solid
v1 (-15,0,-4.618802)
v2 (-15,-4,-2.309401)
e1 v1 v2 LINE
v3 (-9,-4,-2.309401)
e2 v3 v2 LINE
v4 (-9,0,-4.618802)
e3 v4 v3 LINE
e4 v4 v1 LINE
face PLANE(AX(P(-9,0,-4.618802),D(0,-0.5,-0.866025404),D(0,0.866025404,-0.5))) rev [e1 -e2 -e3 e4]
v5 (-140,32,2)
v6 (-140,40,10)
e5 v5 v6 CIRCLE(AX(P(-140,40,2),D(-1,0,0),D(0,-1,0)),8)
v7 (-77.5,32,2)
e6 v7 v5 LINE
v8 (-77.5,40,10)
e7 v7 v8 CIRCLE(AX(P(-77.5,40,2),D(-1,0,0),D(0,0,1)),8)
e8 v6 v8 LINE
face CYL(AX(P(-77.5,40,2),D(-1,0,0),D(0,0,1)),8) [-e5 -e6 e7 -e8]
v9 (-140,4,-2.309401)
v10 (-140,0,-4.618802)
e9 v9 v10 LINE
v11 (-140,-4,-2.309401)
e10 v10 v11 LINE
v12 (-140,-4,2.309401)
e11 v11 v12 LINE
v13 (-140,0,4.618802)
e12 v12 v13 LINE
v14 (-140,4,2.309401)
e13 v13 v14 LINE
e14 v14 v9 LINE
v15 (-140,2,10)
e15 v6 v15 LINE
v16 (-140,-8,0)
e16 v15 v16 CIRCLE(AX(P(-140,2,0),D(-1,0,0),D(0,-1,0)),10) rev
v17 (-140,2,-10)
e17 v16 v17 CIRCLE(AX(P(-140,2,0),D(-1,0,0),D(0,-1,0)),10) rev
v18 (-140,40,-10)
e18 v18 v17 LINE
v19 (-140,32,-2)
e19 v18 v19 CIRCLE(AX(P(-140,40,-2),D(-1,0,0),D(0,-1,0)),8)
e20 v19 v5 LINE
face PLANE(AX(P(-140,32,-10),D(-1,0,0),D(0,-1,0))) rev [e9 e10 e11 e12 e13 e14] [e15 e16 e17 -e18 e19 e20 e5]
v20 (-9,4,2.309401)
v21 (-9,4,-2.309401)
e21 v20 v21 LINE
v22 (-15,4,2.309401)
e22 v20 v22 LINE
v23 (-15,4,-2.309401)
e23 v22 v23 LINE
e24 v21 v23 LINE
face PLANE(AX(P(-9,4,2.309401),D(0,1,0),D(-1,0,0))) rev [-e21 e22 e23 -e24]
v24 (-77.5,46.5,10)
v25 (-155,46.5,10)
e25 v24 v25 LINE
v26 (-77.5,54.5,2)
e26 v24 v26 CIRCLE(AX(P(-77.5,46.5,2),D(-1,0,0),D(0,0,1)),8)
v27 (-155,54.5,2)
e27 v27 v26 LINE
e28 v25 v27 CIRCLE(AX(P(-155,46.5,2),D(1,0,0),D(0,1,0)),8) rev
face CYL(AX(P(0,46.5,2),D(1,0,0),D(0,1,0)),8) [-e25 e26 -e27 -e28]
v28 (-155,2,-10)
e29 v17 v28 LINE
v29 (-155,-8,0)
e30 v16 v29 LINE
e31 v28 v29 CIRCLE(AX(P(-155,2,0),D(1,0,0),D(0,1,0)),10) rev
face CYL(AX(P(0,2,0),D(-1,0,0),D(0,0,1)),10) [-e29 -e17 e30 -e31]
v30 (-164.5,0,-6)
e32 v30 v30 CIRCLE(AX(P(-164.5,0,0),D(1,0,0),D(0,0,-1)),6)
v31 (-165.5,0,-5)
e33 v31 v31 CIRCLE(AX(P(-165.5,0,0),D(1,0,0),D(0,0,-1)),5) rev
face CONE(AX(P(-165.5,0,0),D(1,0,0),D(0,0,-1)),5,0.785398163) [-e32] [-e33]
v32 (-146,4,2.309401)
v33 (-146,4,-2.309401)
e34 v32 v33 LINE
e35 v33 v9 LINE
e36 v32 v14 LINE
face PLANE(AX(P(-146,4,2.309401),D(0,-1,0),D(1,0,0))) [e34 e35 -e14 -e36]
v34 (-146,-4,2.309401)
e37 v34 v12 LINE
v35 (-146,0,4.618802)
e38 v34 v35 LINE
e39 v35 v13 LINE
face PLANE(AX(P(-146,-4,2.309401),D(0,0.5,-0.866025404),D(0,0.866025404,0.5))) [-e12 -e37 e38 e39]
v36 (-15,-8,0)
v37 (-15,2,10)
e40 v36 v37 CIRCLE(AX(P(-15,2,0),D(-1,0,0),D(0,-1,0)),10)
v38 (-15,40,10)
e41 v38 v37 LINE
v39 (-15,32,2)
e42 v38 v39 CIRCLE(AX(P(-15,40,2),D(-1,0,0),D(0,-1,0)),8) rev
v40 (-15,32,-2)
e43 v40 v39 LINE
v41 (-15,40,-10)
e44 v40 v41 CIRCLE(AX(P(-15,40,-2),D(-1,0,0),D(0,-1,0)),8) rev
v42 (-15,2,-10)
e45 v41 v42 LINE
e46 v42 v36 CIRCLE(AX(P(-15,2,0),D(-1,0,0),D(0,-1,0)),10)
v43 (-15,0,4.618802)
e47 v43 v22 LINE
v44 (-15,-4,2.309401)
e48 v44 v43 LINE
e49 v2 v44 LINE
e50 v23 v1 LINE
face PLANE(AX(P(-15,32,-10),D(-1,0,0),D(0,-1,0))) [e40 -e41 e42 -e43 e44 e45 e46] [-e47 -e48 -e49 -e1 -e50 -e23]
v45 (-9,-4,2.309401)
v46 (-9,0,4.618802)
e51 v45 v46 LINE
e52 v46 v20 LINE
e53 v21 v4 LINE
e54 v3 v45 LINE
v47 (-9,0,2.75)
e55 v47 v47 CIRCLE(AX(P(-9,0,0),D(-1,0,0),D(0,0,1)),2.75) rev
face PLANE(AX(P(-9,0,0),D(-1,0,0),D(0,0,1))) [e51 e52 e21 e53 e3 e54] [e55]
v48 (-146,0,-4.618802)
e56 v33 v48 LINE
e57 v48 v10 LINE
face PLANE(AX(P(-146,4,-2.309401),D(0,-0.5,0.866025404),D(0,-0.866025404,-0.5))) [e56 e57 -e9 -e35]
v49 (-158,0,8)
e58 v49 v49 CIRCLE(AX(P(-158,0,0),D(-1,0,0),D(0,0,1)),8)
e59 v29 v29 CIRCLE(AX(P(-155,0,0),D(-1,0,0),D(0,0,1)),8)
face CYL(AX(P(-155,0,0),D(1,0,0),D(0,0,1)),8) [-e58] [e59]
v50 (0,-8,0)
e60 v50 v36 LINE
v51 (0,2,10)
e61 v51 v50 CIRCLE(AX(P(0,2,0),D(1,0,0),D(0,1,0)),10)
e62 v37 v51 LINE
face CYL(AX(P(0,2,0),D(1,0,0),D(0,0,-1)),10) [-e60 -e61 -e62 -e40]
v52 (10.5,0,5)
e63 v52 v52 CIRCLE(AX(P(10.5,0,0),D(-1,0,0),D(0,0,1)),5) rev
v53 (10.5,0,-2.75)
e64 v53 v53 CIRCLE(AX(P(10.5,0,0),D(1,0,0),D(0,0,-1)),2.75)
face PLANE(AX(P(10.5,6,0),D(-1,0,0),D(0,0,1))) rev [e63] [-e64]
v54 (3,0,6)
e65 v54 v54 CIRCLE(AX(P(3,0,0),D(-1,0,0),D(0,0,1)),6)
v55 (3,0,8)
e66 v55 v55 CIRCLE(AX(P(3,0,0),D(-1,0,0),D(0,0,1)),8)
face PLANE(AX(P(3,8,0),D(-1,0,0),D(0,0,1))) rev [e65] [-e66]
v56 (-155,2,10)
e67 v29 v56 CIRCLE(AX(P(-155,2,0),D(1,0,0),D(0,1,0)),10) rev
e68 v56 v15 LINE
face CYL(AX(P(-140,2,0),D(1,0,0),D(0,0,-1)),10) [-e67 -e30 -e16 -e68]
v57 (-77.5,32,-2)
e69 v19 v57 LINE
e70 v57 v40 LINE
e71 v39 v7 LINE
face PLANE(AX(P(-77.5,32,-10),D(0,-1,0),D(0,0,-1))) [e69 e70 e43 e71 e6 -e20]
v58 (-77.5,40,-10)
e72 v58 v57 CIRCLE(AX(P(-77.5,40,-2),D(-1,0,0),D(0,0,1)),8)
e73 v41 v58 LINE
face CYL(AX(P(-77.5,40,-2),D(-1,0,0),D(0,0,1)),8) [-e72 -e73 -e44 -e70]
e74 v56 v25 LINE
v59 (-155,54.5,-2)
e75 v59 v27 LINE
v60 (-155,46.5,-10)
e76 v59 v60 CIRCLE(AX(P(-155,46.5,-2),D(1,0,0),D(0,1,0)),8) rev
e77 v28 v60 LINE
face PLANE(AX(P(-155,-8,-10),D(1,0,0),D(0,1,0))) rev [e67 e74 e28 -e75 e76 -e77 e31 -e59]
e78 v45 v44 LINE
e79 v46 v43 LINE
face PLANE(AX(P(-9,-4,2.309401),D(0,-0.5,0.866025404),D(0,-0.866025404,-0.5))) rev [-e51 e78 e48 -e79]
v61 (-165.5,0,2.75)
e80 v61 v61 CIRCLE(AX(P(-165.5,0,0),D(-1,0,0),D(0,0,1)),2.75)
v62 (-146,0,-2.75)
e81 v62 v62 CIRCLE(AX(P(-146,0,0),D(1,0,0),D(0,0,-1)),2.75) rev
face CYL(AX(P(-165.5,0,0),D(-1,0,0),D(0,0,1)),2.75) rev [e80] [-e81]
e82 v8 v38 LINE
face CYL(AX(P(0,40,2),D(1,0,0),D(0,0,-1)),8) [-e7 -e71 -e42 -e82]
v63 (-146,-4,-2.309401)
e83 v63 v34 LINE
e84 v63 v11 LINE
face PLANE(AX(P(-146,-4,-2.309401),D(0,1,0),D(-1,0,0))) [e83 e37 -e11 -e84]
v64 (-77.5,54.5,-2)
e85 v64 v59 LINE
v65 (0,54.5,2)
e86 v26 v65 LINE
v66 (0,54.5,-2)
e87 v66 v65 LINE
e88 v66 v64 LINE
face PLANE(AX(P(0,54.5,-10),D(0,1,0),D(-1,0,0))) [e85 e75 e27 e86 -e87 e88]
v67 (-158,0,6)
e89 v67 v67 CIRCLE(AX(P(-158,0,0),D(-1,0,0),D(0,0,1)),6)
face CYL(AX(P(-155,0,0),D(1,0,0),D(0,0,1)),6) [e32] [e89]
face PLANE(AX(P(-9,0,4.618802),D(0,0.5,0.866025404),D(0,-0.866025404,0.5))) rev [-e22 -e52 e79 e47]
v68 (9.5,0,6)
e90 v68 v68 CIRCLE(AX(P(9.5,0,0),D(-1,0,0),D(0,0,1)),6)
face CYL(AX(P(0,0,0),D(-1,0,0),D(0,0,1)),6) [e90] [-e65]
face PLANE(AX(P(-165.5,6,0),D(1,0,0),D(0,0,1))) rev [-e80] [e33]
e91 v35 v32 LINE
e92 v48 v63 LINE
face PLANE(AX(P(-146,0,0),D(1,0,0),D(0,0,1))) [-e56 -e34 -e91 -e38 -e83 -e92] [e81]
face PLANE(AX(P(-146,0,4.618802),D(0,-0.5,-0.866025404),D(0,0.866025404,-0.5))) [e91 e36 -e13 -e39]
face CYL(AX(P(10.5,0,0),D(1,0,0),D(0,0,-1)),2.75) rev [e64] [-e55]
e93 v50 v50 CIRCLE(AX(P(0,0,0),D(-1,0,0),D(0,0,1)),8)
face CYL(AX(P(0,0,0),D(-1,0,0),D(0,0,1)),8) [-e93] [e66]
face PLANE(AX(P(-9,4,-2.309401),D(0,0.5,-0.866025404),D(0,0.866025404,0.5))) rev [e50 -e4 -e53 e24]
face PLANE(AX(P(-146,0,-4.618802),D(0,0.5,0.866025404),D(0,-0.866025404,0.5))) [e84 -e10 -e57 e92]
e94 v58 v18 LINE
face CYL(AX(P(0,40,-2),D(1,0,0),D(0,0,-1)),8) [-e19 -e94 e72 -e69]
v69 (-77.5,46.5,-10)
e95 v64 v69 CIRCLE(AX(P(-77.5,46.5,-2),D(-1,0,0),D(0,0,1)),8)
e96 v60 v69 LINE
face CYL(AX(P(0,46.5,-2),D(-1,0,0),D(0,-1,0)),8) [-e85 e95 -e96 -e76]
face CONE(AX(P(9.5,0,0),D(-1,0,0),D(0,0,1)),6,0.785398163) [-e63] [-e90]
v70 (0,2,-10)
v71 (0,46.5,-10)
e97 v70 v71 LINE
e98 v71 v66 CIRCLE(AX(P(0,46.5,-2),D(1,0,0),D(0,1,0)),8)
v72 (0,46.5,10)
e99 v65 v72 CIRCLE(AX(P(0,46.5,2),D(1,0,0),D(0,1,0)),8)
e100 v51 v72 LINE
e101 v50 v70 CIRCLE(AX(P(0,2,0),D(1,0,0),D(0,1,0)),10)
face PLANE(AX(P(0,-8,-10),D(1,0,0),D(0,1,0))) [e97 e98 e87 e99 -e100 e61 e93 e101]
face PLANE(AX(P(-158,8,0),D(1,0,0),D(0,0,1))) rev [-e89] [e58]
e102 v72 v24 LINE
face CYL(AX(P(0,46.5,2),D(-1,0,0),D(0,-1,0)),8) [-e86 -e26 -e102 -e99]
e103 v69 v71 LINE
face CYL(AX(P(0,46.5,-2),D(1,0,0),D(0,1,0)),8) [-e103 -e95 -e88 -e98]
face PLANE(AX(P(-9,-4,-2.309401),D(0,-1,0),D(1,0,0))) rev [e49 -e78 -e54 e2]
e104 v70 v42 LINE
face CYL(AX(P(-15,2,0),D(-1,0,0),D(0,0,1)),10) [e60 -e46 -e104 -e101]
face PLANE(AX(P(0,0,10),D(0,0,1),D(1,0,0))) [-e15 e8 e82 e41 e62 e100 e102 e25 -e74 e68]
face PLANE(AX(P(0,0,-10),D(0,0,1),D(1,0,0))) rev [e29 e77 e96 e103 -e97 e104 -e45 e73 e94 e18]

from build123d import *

# Parameters (mm, degrees)
CONNECTOR_MOUNTING_CHAMFER_SIZE              = 1
HANDLE_BODY_DEPTH                            = 10
LOWER_HANDLE_FILLET_R                        = 10
UPPER_HANDLE_FILLET_R                        = 8
MOUNTING_SCREW_HOLE_D                        = 5.5
NUT_CUTOUT_DEPTH                             = 6
LOWER_HANDLE_FILLET_OF_HANDLE_MIRROR_R       = 10
UPPER_HANDLE_FILLET_OF_HANDLE_MIRROR_R       = 8
CONNECTOR_MOUNTING_CHAMFER_OF_CONNECTOR_SIZE = 1


with BuildPart() as part:
    # Sketch1 → connector_body (revolve)
    with BuildSketch(Plane.XY, mode=Mode.PRIVATE) as connector_body_sk:
        Polygon((0, 0), (0, 8), (3, 8), (3, 6), (10.5, 6), (10.5, 0), align=None)
    connector_body = revolve(connector_body_sk.sketch.rotate(Axis((0, 0, 0), (1, 0, 0)), 90), axis=Axis((0, 0, 0), (1, 0, 0)))

    # connector_mounting_chamfer
    connector_mounting_chamfer_edges = [part.edges().sort_by_distance(p)[0] for p in [
        (10.5, 0, -6),
    ]]
    chamfer(connector_mounting_chamfer_edges, length=CONNECTOR_MOUNTING_CHAMFER_SIZE)

    # Sketch2 → handle_body (add, symmetric)
    with BuildSketch(Plane.XY):
        Polygon((0, -8), (0, 54.5), (-77.5, 54.5), (-77.5, 32), (-15, 32), (-15, -8), align=None)
    handle_body = extrude(amount=HANDLE_BODY_DEPTH, both=True)

    # lower_handle_fillet
    # the kernel refuses this fillet: 10 mm, written as the material it takes off along each edge
    with BuildSketch(Plane(origin=(-40, -8, -10), x_dir=(0, 0, 1), z_dir=(1, 0, 0))) as lower_handle_fillet_piece_1:
        with BuildLine():
            CenterArc((LOWER_HANDLE_FILLET_R, -LOWER_HANDLE_FILLET_R), LOWER_HANDLE_FILLET_R, 90, 90)
            Line((0, -LOWER_HANDLE_FILLET_R), (0, 0))
            Line((0, 0), (LOWER_HANDLE_FILLET_R, 0))
        make_face()
    extrude(amount=65, mode=Mode.SUBTRACT)
    with BuildSketch(Plane(origin=(-40, -8, 10), x_dir=(0, 0, -1), z_dir=(1, 0, 0))) as lower_handle_fillet_piece_2:
        with BuildLine():
            CenterArc((LOWER_HANDLE_FILLET_R, LOWER_HANDLE_FILLET_R), LOWER_HANDLE_FILLET_R, 180, 90)
            Line((0, LOWER_HANDLE_FILLET_R), (0, 0))
            Line((0, 0), (LOWER_HANDLE_FILLET_R, 0))
        make_face()
    extrude(amount=65, mode=Mode.SUBTRACT)

    # upper_handle_fillet
    upper_handle_fillet_edges = [part.edges().sort_by_distance(p)[0] for p in [
        (-46.25, 32, -10),
        (-38.75, 54.5, -10),
        (-38.75, 54.5, 10),
        (-46.25, 32, 10),
    ]]
    fillet(upper_handle_fillet_edges, radius=UPPER_HANDLE_FILLET_R)

    # mounting_screw_hole (through all)
    with Locations(Plane(origin=(10.5, 0, 0), x_dir=(0, 0, -1), z_dir=(1, 0, 0))):
        with Locations((0, 0)):
            mounting_screw_hole = Hole(MOUNTING_SCREW_HOLE_D / 2)

    # Sketch6 → nut_cutout (cut)
    with BuildSketch(Plane.ZY.offset(15)):
        Polygon((4.618802154, 0), (2.309401077, 4), (-2.309401077, 4), (-4.618802154, 0), (-2.309401077, -4), (2.309401077, -4), align=None)
    nut_cutout = extrude(amount=-NUT_CUTOUT_DEPTH, mode=Mode.SUBTRACT)

    # handle_mirror: handle_body across plane
    add(handle_body.mirror(Plane(origin=(-77.5, 0, 0), x_dir=(0, 0, 1), z_dir=(1, 0, 0))))

    # lower_handle_fillet of handle_mirror
    # the kernel refuses this fillet: 10 mm, written as the material it takes off along each edge
    with BuildSketch(Plane(origin=(-115, -8, -10), x_dir=(0, 1, 0), z_dir=(-1, 0, 0))) as lower_handle_fillet_of_handle_mirror_piece_1:
        with BuildLine():
            CenterArc((LOWER_HANDLE_FILLET_OF_HANDLE_MIRROR_R, -LOWER_HANDLE_FILLET_OF_HANDLE_MIRROR_R), LOWER_HANDLE_FILLET_OF_HANDLE_MIRROR_R, 90, 90)
            Line((0, -LOWER_HANDLE_FILLET_OF_HANDLE_MIRROR_R), (0, 0))
            Line((0, 0), (LOWER_HANDLE_FILLET_OF_HANDLE_MIRROR_R, 0))
        make_face()
    extrude(amount=65, mode=Mode.SUBTRACT)
    with BuildSketch(Plane(origin=(-115, -8, 10), x_dir=(0, 1, 0), z_dir=(-1, 0, 0))) as lower_handle_fillet_of_handle_mirror_piece_2:
        with BuildLine():
            CenterArc((LOWER_HANDLE_FILLET_OF_HANDLE_MIRROR_R, LOWER_HANDLE_FILLET_OF_HANDLE_MIRROR_R), LOWER_HANDLE_FILLET_OF_HANDLE_MIRROR_R, 180, 90)
            Line((0, LOWER_HANDLE_FILLET_OF_HANDLE_MIRROR_R), (0, 0))
            Line((0, 0), (LOWER_HANDLE_FILLET_OF_HANDLE_MIRROR_R, 0))
        make_face()
    extrude(amount=65, mode=Mode.SUBTRACT)

    # upper_handle_fillet of handle_mirror
    upper_handle_fillet_of_handle_mirror_edges = [part.edges().sort_by_distance(p)[0] for p in [
        (-108.75, 32, -10),
        (-116.25, 54.5, -10),
        (-116.25, 54.5, 10),
        (-108.75, 32, 10),
    ]]
    fillet(upper_handle_fillet_of_handle_mirror_edges, radius=UPPER_HANDLE_FILLET_OF_HANDLE_MIRROR_R)

    # connector_mirror: connector_body, mounting_screw_hole, nut_cutout across plane
    add(connector_body.mirror(Plane(origin=(-77.5, 0, 0), x_dir=(0, 0, 1), z_dir=(1, 0, 0))))
    add(mounting_screw_hole.mirror(Plane(origin=(-77.5, 0, 0), x_dir=(0, 0, 1), z_dir=(1, 0, 0))), mode=Mode.SUBTRACT)
    add(nut_cutout.mirror(Plane(origin=(-77.5, 0, 0), x_dir=(0, 0, 1), z_dir=(1, 0, 0))), mode=Mode.SUBTRACT)

    # connector_mounting_chamfer of connector
    connector_mounting_chamfer_of_connector_edges = [part.edges().sort_by_distance(p)[0] for p in [
        (-165.5, 0, -6),
    ]]
    chamfer(connector_mounting_chamfer_of_connector_edges, length=CONNECTOR_MOUNTING_CHAMFER_OF_CONNECTOR_SIZE)


solid = part.part
